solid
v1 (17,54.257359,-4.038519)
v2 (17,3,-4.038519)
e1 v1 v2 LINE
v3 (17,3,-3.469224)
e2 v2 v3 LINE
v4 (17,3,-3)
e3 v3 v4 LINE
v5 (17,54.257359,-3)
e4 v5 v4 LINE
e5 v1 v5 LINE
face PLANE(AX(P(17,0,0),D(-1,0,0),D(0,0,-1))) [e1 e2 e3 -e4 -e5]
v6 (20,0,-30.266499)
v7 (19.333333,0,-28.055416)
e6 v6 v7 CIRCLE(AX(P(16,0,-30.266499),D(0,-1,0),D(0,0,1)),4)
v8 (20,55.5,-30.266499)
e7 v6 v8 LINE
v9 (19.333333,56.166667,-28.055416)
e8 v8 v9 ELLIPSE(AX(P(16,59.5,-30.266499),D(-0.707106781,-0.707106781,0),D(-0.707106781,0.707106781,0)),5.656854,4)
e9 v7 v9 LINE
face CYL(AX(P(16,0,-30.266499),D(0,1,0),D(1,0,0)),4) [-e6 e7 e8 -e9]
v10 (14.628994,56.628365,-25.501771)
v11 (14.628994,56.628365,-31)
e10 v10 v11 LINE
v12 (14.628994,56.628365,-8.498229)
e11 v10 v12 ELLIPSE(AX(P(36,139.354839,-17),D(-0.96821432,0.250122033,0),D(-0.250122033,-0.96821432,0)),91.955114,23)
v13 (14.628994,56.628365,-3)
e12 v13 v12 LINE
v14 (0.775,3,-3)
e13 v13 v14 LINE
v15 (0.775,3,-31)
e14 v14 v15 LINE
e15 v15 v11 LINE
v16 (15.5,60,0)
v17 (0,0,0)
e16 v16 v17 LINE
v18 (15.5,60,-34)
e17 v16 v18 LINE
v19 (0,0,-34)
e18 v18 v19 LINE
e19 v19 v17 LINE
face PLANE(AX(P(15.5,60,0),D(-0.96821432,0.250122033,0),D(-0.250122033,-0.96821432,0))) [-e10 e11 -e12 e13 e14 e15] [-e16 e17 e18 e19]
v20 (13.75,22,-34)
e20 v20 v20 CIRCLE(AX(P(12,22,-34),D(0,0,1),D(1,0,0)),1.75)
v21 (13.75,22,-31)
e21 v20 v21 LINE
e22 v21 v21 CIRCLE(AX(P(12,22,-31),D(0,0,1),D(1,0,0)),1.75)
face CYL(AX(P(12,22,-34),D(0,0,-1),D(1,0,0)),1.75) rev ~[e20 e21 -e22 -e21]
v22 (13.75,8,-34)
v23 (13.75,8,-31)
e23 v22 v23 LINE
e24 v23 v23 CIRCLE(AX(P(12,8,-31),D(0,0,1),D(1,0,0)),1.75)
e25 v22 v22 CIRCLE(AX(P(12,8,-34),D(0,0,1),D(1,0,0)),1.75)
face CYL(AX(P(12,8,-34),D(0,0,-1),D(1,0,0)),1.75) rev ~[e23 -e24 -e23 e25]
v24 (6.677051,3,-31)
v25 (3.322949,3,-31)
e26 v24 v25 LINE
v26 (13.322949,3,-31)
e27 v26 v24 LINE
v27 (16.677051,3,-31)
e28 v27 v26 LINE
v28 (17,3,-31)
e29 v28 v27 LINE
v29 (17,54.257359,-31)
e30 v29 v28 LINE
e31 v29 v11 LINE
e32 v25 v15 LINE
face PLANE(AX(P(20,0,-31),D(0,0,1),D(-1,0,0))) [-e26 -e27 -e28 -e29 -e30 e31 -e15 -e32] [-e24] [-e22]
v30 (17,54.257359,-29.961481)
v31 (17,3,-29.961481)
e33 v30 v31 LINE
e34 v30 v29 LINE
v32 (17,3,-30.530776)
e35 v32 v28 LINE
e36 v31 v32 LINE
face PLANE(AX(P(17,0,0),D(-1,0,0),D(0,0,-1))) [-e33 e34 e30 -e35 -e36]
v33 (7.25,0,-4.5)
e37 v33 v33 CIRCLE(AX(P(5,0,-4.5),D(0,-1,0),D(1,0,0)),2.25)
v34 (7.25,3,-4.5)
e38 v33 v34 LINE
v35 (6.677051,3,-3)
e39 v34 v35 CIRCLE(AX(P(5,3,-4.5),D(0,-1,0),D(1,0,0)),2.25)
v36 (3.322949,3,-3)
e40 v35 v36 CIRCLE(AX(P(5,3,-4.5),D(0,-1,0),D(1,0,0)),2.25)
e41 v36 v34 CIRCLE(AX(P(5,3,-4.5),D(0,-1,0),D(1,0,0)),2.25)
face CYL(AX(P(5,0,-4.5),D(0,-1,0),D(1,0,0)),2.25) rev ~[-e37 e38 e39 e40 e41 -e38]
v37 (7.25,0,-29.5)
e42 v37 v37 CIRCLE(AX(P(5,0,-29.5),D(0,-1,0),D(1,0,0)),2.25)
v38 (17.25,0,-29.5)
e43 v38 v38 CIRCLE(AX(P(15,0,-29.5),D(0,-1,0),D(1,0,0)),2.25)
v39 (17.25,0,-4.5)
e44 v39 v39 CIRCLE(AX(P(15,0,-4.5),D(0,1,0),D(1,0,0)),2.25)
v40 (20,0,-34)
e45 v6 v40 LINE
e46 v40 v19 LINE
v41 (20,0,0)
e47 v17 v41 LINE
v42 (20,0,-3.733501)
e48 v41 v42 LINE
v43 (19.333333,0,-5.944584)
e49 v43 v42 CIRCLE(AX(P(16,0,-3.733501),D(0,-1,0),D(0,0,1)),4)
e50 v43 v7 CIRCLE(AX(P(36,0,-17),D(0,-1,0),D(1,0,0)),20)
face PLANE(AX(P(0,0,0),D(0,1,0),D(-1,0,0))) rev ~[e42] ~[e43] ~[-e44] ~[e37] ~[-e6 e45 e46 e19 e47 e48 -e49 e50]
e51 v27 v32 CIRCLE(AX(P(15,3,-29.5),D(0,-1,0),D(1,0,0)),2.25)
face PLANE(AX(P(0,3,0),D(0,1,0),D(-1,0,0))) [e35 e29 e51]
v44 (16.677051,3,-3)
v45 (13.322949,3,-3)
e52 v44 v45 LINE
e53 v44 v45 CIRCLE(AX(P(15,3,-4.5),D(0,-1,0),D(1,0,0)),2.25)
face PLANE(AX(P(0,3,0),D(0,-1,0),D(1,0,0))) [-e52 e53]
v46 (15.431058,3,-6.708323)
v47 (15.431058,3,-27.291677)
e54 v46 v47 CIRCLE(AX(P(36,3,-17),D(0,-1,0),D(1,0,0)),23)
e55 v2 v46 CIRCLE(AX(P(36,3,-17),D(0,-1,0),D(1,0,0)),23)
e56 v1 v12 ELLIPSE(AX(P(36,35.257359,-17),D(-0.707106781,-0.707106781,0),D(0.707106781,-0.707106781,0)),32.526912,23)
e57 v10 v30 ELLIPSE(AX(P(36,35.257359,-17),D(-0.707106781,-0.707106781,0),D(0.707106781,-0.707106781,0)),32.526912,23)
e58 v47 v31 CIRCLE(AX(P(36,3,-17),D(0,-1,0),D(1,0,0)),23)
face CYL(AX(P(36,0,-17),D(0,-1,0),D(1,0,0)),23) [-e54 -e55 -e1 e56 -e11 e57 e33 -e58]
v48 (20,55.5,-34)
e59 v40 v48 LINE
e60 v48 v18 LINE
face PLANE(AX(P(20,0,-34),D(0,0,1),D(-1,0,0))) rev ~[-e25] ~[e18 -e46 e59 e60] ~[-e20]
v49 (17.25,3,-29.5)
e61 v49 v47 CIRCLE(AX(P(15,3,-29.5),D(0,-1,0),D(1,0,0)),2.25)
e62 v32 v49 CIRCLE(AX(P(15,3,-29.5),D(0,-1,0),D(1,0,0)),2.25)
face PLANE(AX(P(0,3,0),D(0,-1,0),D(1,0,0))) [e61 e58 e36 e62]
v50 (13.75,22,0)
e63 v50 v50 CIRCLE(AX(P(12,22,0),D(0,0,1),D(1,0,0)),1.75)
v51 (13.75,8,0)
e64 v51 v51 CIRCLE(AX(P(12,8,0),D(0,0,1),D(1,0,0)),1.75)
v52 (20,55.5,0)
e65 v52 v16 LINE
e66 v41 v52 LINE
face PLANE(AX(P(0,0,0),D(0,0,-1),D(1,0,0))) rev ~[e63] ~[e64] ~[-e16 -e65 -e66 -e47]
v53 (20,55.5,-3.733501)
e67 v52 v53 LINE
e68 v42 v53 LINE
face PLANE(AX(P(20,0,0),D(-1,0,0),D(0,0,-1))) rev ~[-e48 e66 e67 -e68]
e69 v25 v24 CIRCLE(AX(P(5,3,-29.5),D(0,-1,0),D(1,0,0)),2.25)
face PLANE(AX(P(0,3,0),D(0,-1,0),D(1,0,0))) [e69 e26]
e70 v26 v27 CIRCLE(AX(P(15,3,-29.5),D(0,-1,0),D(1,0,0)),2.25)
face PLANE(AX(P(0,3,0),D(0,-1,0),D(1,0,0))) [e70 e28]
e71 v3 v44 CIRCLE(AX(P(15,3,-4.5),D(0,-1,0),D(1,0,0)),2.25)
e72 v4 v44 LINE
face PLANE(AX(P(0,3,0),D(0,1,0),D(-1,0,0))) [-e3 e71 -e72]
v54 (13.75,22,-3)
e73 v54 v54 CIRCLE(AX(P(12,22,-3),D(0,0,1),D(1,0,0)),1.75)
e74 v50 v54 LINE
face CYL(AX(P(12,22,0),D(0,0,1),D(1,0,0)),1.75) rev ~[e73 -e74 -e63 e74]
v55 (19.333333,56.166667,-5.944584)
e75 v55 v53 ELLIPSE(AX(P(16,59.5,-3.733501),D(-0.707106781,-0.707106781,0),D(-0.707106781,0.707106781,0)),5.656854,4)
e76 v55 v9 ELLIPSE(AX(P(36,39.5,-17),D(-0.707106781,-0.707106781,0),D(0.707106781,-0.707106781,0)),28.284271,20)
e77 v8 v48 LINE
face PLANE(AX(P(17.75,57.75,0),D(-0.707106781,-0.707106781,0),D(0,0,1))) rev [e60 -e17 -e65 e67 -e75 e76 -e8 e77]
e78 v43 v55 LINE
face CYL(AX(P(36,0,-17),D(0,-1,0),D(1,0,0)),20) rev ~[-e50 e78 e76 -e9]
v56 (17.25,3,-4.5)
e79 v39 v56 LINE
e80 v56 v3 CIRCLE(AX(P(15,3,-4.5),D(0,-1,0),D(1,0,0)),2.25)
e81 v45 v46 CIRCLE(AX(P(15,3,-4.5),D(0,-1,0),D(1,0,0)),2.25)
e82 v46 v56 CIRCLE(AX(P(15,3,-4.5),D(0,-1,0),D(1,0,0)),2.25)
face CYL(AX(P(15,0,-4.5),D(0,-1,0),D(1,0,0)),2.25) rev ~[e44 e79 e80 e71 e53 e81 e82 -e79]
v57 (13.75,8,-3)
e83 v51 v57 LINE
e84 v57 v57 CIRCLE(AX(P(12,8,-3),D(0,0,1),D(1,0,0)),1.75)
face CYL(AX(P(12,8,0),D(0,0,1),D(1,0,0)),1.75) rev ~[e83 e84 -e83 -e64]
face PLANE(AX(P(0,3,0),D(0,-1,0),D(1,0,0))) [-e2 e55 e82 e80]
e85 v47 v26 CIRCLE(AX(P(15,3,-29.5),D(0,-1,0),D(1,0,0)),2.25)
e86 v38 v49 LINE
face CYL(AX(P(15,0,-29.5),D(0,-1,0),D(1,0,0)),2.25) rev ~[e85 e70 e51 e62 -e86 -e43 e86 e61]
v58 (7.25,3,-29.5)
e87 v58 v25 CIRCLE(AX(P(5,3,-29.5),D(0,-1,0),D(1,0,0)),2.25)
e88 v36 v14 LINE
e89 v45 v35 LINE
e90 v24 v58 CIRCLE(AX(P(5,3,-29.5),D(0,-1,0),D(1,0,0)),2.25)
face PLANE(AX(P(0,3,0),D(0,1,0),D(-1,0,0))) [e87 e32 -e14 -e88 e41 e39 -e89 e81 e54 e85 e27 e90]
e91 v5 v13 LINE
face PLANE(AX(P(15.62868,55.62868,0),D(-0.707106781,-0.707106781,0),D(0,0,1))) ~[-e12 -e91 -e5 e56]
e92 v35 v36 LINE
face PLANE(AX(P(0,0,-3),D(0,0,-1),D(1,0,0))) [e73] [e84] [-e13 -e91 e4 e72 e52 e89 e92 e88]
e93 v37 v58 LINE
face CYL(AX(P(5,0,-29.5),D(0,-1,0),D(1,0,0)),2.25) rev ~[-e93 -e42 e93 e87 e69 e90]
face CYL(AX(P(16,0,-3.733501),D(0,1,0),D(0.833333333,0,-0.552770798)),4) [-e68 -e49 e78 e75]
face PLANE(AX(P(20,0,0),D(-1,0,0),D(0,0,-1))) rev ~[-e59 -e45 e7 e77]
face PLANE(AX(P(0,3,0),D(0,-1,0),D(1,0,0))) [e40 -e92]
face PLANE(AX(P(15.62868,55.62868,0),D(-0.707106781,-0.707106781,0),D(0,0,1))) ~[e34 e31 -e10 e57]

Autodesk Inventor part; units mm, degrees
ref_plane "YZ Plane" through (0, 0, 0) normal (1, 0, 0) x (0, 1, 0)
ref_plane "XZ Plane" through (0, 0, 0) normal (0, 1, 0) x (-1, 0, 0)
sketch "Sketch1" plane through (0, 0, 0) normal (0, 1, 0) x (-1, 0, 0)
  line L0 (0, 0) -> (-20, 0)
  line L1 (-20, 0) -> (-20, -34)
  line L2 (-20, -34) -> (0, -34)
  line L3 (0, -34) -> (0, 0)
  dimension "d0" = 34
  dimension "d1" = 20
extrude "Extrusion1" add sketch "Sketch1" along normal blind 60
chamfer "Chamfer1" distance 4.5 angle 45 1 edges at (20, 60, -17)
sketch "Sketch3" plane through (0, 0, 0) normal (0, 0, 1) x (1, 0, 0)
  line L0 (0, 60) -> (15.5, 60) projected
  line L1 (15.5, 60) -> (0, 0)
  line L2 (0, 0) -> (20, 0) projected
  line L3 (20, 0) -> (0, 0)
  line L4 (0, 0) -> (0, 60)
  line L5 (0, 60) -> (20, 60)
  line L6 (20, 60) -> (20, 0)
extrude "Extrusion2" cut sketch "Sketch3" against normal blind 60 contours L0 L1 L4
sketch "Sketch8" plane through (0, 0, 0) normal (0, -1, 0) x (1, 0, 0)
  line L0 (20, 0) -> (20, -34) projected
  line L1 (20, -17) -> (36, -17) construction
  circle A0 centre (36, -17) radius 20
  point P0 (0, 0)
  point P1 (20, -29)
  point P2 (20, -5)
  dimension "d44" = 40
  dimension "d45" = 16
extrude "Extrusion7" cut sketch "Sketch8" against normal through all contours L0 A0 picked at (19.2708, -19.7731)
shell "Shell2" thickness 3 removed faces 1 at (10.3333, 40, -22.6667)
sketch "Sketch9" plane through (0, 0, 0) normal (0, -1, 0) x (1, 0, 0)
  circle A0 centre (5, -4.5) radius 2.25
  line L0 (0, 0) -> (20, 0) projected
  line L1 (0, -34) -> (0, 0) projected
  line L2 (5, -4.5) -> (15, -4.5) construction
  line L3 (14.629, -8.4982) -> (14.629, -3) projected
  line L4 (5, -4.5) -> (15, -4.5) construction
  circle A1 centre (15, -4.5) radius 2.25
  line L5 (0, -17) -> (10, -17) construction
  circle A2 centre (5, -29.5) radius 2.25
  circle A3 centre (15, -29.5) radius 2.25
  dimension "d49" = 4.5
  dimension "d50" = 4.5
  dimension "d51" = 5
  dimension "d52" = 10
  dimension "d53" = 360
  dimension "d54" = 4.5
  dimension "d56" = 25
extrude "Extrusion8" cut sketch "Sketch9" against normal blind 3
fillet "Fillet2" radius 4 2 edges at (20, 27.75, -5) (20, 27.75, -29)
sketch "Sketch10" plane through (20, 0, 0) normal (0, 0, 1) x (1, 0, 0)
  circle A0 centre (-8, 8) radius 1.75
  line L0 (-8, 8) -> (-8, 22) construction
  circle A1 centre (-8, 22) radius 1.75
  point P0 (-20, 0)
  dimension "d60" = 3.5
  dimension "d61" = 12
  dimension "d62" = 8
  dimension "d64" = 3.5
extrude "Extrusion9" cut sketch "Sketch10" against normal blind 3
ref_plane "Work Plane1" through (0, 0, -17) normal (0, 0, 1) x (1, 0, 0)
mirror "Mirror1" about plane through (0, 0, -17) normal (0, 0, 1) of "Extrusion9"
properties part number "Gripper"
